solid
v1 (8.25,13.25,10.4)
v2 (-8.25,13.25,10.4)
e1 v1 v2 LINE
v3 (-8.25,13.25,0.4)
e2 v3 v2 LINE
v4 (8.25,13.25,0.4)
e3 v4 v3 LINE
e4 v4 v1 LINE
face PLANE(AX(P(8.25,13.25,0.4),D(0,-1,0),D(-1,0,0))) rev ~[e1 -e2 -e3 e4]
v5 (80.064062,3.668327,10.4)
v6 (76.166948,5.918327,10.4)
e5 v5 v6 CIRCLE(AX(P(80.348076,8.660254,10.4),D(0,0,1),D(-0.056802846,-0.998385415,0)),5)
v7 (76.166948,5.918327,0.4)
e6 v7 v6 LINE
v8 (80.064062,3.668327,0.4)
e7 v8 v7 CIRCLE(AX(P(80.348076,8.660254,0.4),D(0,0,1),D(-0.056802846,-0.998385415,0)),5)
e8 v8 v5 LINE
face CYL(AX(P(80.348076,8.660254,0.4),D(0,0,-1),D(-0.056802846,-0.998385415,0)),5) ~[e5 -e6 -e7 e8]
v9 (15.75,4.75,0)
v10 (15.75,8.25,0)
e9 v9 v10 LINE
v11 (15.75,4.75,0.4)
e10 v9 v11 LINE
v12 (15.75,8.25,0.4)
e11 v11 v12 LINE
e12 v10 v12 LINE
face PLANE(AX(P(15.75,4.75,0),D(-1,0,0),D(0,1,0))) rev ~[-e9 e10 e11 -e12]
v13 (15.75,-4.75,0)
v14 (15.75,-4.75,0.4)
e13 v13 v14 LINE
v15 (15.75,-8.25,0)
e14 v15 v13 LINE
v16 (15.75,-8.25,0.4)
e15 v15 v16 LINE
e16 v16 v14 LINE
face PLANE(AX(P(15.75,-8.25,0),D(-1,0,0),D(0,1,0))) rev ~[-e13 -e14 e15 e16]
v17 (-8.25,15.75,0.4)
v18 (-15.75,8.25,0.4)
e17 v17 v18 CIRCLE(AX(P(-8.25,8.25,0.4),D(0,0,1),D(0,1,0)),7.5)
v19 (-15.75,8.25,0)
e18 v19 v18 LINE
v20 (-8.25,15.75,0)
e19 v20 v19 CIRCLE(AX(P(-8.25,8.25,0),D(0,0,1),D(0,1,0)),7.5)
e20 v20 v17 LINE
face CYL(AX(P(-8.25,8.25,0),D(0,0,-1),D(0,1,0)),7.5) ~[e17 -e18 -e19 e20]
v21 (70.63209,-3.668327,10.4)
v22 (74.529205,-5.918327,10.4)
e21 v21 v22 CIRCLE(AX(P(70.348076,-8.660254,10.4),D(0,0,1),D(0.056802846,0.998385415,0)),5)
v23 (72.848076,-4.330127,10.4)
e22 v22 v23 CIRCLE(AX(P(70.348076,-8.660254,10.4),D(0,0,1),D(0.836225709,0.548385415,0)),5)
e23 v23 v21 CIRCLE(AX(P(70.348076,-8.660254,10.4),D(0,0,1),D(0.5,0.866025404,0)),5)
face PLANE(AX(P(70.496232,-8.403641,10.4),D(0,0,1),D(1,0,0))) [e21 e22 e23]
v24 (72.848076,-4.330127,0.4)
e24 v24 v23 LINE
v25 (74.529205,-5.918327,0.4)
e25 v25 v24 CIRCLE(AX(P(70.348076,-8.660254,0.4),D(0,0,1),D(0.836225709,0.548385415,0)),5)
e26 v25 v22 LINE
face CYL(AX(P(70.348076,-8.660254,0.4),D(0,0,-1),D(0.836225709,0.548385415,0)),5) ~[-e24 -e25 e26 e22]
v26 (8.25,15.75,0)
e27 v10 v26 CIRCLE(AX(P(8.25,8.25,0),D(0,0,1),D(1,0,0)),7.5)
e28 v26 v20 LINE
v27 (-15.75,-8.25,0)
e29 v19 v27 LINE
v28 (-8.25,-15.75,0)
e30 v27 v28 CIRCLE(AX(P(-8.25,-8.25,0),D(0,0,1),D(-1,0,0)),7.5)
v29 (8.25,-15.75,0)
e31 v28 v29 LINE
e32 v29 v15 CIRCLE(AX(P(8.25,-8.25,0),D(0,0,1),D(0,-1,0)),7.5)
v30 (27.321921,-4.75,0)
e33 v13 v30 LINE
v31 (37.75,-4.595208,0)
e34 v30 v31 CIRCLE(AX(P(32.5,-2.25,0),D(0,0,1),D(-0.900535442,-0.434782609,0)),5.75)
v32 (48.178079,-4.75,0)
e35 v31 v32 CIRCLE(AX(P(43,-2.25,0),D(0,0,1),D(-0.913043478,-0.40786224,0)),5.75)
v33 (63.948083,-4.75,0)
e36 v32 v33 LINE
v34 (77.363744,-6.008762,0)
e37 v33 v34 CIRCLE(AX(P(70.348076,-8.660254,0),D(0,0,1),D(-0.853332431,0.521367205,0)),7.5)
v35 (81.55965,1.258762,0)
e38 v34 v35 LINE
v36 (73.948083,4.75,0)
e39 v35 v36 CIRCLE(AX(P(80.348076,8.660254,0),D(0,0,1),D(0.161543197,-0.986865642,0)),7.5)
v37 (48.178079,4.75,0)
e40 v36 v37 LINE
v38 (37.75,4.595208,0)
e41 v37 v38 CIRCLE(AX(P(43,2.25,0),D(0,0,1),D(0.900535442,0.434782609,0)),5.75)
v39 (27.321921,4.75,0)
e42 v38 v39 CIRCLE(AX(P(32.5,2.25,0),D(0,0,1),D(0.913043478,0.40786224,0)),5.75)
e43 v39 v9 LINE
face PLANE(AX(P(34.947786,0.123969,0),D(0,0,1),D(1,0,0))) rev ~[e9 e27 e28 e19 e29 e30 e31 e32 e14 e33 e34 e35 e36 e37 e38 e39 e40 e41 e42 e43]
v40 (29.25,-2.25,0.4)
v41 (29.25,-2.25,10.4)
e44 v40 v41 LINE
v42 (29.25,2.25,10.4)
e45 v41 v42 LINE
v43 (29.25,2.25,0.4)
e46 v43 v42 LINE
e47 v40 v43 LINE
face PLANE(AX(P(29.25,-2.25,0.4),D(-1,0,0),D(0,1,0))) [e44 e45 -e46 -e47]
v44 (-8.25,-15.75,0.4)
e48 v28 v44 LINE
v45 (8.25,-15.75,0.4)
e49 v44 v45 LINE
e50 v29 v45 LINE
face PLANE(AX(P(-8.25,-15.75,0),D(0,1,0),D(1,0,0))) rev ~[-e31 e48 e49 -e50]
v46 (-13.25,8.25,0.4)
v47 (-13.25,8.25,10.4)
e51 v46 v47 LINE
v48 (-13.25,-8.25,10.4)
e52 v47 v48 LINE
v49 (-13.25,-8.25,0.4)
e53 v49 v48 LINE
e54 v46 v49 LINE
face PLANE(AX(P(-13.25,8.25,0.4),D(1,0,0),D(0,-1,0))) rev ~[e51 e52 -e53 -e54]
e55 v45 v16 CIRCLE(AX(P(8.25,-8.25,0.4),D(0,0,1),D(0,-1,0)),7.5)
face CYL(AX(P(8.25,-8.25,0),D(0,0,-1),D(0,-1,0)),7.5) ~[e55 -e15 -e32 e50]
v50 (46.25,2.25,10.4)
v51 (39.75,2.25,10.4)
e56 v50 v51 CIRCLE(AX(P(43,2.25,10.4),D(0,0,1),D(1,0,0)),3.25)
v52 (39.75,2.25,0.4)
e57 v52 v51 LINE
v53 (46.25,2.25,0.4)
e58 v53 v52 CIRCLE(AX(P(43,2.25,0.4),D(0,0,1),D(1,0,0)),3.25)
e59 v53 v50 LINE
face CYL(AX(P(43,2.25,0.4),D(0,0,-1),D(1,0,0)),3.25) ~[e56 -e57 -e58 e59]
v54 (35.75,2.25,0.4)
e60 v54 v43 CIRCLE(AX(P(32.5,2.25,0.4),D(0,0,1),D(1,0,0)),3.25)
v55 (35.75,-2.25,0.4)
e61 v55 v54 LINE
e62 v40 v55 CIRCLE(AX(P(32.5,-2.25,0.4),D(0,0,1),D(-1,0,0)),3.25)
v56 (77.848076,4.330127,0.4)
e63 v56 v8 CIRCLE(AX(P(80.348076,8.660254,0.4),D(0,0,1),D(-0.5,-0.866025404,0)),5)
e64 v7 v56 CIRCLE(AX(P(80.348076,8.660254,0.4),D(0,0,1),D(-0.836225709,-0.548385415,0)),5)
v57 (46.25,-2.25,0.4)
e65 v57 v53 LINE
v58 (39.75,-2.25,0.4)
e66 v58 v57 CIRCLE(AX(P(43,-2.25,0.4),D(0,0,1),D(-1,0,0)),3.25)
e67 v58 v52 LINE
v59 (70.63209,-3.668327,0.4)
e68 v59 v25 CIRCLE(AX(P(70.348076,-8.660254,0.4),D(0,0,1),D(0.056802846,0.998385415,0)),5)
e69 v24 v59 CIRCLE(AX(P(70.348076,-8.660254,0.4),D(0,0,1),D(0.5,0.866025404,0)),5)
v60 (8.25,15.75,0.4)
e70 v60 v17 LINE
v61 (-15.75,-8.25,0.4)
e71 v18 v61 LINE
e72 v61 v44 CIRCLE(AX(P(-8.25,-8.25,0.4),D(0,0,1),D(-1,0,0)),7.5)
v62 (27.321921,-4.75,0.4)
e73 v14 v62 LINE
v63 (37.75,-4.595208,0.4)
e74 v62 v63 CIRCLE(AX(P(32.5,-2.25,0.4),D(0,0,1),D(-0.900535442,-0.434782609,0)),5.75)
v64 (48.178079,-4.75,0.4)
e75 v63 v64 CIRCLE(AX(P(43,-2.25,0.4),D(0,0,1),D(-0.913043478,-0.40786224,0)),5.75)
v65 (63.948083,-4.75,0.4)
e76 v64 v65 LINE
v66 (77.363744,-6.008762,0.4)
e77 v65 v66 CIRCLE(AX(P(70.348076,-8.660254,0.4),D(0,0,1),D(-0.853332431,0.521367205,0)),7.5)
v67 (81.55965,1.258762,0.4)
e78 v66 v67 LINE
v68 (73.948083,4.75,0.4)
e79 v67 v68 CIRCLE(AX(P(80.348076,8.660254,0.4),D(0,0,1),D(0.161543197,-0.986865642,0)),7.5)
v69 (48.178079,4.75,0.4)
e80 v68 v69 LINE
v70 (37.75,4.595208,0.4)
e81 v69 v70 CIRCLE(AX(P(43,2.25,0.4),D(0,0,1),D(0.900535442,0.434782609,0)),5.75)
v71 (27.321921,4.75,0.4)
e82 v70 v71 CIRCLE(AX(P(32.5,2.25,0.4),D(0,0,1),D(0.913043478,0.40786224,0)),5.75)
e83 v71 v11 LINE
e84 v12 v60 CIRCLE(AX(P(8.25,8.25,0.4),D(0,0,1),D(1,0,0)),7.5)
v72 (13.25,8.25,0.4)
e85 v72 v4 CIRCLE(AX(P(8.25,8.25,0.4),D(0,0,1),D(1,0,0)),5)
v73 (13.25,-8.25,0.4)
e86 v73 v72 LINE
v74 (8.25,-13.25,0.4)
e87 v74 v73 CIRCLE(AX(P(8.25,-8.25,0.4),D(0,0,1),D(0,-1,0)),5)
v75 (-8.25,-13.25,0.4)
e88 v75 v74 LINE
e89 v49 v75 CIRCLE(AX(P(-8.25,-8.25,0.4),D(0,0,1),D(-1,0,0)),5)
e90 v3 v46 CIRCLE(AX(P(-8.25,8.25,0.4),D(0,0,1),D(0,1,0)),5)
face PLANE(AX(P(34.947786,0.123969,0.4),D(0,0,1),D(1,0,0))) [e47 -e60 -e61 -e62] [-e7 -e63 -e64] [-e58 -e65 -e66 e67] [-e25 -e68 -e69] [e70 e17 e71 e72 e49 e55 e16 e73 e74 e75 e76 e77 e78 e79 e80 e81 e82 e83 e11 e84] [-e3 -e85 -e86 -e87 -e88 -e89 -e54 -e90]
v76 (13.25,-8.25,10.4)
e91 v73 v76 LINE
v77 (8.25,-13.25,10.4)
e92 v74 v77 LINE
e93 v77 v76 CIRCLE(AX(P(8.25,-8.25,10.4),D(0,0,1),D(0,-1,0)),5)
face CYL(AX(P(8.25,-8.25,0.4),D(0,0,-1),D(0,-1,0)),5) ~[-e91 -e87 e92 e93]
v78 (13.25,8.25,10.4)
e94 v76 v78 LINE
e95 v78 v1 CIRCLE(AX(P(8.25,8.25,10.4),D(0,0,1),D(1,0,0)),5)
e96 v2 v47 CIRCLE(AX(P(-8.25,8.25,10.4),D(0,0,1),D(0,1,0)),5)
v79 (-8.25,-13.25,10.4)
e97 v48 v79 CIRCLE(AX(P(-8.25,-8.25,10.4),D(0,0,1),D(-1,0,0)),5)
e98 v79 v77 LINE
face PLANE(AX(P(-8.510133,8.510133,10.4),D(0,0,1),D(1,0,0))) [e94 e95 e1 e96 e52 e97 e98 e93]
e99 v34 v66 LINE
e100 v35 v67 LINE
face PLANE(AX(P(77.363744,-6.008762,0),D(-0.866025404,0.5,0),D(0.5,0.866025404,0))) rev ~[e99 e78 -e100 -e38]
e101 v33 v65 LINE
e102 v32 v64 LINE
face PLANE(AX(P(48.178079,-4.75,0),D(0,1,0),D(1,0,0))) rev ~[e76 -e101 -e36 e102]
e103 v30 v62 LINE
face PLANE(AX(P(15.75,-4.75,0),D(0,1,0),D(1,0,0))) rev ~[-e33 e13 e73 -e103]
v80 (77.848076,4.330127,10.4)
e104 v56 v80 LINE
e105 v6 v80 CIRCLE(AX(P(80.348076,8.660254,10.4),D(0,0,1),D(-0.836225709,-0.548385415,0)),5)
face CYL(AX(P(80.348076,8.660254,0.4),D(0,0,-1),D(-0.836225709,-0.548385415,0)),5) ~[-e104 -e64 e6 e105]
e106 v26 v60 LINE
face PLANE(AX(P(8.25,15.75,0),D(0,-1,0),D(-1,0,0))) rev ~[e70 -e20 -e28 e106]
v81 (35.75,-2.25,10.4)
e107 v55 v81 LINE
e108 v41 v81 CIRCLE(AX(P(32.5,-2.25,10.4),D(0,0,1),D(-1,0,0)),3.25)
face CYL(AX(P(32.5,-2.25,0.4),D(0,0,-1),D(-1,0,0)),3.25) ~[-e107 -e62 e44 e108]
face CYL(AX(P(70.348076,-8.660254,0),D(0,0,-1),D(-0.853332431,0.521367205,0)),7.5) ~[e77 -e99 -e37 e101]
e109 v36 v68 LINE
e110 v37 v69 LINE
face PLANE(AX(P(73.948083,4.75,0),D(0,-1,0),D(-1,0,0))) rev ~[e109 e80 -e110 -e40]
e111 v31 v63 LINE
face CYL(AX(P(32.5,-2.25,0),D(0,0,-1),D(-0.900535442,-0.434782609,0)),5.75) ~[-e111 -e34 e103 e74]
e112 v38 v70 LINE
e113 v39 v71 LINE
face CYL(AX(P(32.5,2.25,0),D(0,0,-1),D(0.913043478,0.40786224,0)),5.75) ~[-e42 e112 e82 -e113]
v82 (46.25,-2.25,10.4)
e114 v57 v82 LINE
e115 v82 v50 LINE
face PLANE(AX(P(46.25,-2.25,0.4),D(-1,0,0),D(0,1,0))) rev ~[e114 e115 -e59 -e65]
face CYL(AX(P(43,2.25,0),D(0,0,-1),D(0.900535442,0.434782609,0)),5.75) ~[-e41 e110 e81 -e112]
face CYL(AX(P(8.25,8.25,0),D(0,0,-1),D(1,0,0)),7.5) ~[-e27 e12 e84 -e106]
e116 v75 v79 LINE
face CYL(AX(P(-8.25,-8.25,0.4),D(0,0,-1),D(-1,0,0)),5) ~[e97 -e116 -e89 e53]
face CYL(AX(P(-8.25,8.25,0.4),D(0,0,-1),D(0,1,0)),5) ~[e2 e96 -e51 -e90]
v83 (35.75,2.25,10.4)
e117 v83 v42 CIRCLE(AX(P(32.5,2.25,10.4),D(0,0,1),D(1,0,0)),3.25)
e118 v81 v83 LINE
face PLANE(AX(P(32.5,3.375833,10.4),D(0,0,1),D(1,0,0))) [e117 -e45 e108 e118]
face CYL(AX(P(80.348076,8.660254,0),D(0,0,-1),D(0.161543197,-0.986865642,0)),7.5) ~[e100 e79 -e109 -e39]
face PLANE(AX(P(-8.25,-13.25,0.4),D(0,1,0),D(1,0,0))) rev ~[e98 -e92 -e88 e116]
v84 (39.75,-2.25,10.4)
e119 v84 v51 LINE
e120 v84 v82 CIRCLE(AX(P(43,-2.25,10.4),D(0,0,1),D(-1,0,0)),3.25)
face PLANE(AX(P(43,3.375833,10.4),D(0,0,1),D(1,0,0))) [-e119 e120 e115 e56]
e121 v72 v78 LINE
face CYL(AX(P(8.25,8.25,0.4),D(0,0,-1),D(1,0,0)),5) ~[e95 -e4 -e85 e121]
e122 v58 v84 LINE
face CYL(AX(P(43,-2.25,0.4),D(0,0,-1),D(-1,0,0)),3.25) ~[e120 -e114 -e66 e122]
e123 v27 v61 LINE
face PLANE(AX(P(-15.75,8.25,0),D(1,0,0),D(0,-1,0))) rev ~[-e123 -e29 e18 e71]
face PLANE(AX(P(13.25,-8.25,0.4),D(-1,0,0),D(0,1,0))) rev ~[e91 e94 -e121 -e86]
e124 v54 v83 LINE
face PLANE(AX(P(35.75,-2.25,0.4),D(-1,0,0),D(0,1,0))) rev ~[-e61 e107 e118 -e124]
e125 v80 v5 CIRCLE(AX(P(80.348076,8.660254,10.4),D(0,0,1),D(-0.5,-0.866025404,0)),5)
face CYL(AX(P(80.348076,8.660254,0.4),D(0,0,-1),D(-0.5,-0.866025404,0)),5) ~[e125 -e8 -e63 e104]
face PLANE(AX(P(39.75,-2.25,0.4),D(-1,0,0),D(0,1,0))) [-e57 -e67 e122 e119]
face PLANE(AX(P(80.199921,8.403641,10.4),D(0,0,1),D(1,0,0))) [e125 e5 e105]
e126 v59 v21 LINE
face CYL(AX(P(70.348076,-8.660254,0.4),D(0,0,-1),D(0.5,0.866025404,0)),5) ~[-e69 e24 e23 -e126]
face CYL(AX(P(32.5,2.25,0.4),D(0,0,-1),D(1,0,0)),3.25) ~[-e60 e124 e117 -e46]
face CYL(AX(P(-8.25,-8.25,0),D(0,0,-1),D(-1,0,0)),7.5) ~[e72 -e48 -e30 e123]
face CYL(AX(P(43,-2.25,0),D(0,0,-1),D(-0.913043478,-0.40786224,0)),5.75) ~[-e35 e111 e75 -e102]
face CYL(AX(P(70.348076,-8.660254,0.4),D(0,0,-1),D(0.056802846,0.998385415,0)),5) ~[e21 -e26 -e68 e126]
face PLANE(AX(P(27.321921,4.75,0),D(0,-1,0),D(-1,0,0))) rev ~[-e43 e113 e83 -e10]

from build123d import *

# Parameters (mm, degrees)
F0_W     = 16
F0_H     = 4.5
F0_W_2   = 6.5
F0_W_3   = 4
F1_DEPTH = 0.4
F2_W     = 6.5
F2_H     = 4.5
F3_DEPTH = 10


# Not quite as in the source:
# - the program builds the solid bodies; features that only make, move or delete a surface that nothing else refers to are left out


with BuildPart() as f1:
    # F0 (on Top) → F1 (new body)
    with BuildSketch(Plane.XY):
        with BuildLine():
            Line((15.75, 4.75), (15.75, 8.25))
            ThreePointArc((15.75, 8.25), (13.5533008589, 13.5533008589), (8.25, 15.75))
            Line((8.25, 15.75), (-8.25, 15.75))
            ThreePointArc((-8.25, 15.75), (-13.5533008589, 13.5533008589), (-15.75, 8.25))
            Line((-15.75, 8.25), (-15.75, -8.25))
            ThreePointArc((-15.75, -8.25), (-13.5533008589, -13.5533008589), (-8.25, -15.75))
            Line((-8.25, -15.75), (8.25, -15.75))
            ThreePointArc((8.25, -15.75), (13.5533008589, -13.5533008589), (15.75, -8.25))
            Line((15.75, -8.25), (15.75, -4.75))
            Line((15.75, -4.75), (27.3219212057, -4.75))
            ThreePointArc((27.3219212057, -4.75), (32.5853423404, -7.9993666334), (37.75, -4.5952078799))
            ThreePointArc((37.75, -4.5952078799), (42.9146576596, -7.9993666334), (48.1780787943, -4.75))
            Line((48.1780787943, -4.75), (63.9480829801, -4.75))
            ThreePointArc((63.9480829801, -4.75), (69.6474451199, -16.1274567319), (77.3637435709, -6.0087617221))
            Line((77.3637435709, -6.0087617221), (81.5596501878, 1.2587617221))
            ThreePointArc((81.5596501878, 1.2587617221), (83.4749132345, 15.4773568118), (73.9480829801, 4.75))
            Line((73.9480829801, 4.75), (48.1780787943, 4.75))
            ThreePointArc((48.1780787943, 4.75), (42.9146576596, 7.9993666334), (37.75, 4.5952078799))
            ThreePointArc((37.75, 4.5952078799), (32.5853423404, 7.9993666334), (27.3219212057, 4.75))
            Line((27.3219212057, 4.75), (15.75, 4.75))
        make_face()
        with BuildLine():
            Line((4.5, 13.25), (8.25, 13.25))
            ThreePointArc((8.25, 13.25), (11.7855339059, 11.7855339059), (13.25, 8.25))
            Line((13.25, 8.25), (13.25, 4.5))
            Line((13.25, 4.5), (13.25, 2.25))
            Line((13.25, 2.25), (29.25, 2.25))
            ThreePointArc((29.25, 2.25), (32.5, 5.5), (35.75, 2.25))
            Line((35.75, 2.25), (39.75, 2.25))
            ThreePointArc((39.75, 2.25), (43, 5.5), (46.25, 2.25))
            Line((46.25, 2.25), (74.0490381057, 2.25))
            Line((74.0490381057, 2.25), (76.1669476654, 5.9183269633))
            ThreePointArc((76.1669476654, 5.9183269633), (82.8480762114, 12.9903810568), (80.0640619824, 3.6683269633))
            Line((80.0640619824, 3.6683269633), (74.5292047573, -5.9183269633))
            ThreePointArc((74.5292047573, -5.9183269633), (69.1116253195, -13.504961376), (67.9923047195, -4.25))
            ThreePointArc((67.9923047195, -4.25), (69.2721438624, -3.7773891431), (70.6320904403, -3.6683269633))
            Line((70.6320904403, -3.6683269633), (71.4509618943, -2.25))
            Line((71.4509618943, -2.25), (46.25, -2.25))
            ThreePointArc((46.25, -2.25), (43, -5.5), (39.75, -2.25))
            Line((39.75, -2.25), (35.75, -2.25))
            ThreePointArc((35.75, -2.25), (32.5, -5.5), (29.25, -2.25))
            Line((29.25, -2.25), (13.25, -2.25))
            Line((13.25, -2.25), (13.25, -4.5))
            Line((13.25, -4.5), (13.25, -8.25))
            ThreePointArc((13.25, -8.25), (11.7855339059, -11.7855339059), (8.25, -13.25))
            Line((8.25, -13.25), (4.5, -13.25))
            Line((4.5, -13.25), (-4.5, -13.25))
            Line((-4.5, -13.25), (-8.25, -13.25))
            ThreePointArc((-8.25, -13.25), (-11.7855339059, -11.7855339059), (-13.25, -8.25))
            Line((-13.25, -8.25), (-13.25, -4.5))
            Line((-13.25, -4.5), (-13.25, 4.5))
            Line((-13.25, 4.5), (-13.25, 8.25))
            ThreePointArc((-13.25, 8.25), (-11.7855339059, 11.7855339059), (-8.25, 13.25))
            Line((-8.25, 13.25), (-4.5, 13.25))
            Line((-4.5, 13.25), (4.5, 13.25))
        make_face(mode=Mode.SUBTRACT)
        with BuildLine():
            Line((13.25, -4.5), (4.5, -4.5))
            Line((4.5, -4.5), (4.5, -13.25))
            Line((4.5, -13.25), (8.25, -13.25))
            ThreePointArc((8.25, -13.25), (11.7855339059, -11.7855339059), (13.25, -8.25))
            Line((13.25, -8.25), (13.25, -4.5))
        make_face()
        Polygon((13.25, 4.5), (4.5, 4.5), (4.5, 0), (4.5, -4.5), (13.25, -4.5), (13.25, -2.25), (13.25, 2.25), align=None)
        with BuildLine():
            ThreePointArc((13.25, 8.25), (11.7855339059, 11.7855339059), (8.25, 13.25))
            Line((8.25, 13.25), (4.5, 13.25))
            Line((4.5, 13.25), (4.5, 4.5))
            Line((4.5, 4.5), (13.25, 4.5))
            Line((13.25, 4.5), (13.25, 8.25))
        make_face()
        Polygon((4.5, 4.5), (4.5, 13.25), (-4.5, 13.25), (-4.5, 4.5), (0, 4.5), align=None)
        with Locations((21.25, 0)):
            Rectangle(F0_W, F0_H)
        with Locations((32.5, 0)):
            Rectangle(F0_W_2, F0_H)
        with BuildLine():
            ThreePointArc((35.75, 2.25), (32.5, 5.5), (29.25, 2.25))
            Line((29.25, 2.25), (35.75, 2.25))
        make_face()
        with BuildLine():
            Line((35.75, -2.25), (29.25, -2.25))
            ThreePointArc((29.25, -2.25), (32.5, -5.5), (35.75, -2.25))
        make_face()
        with Locations((37.75, 0)):
            Rectangle(F0_W_3, F0_H)
        with BuildLine():
            ThreePointArc((46.25, 2.25), (43, 5.5), (39.75, 2.25))
            Line((39.75, 2.25), (46.25, 2.25))
        make_face()
        with Locations((43, 0)):
            Rectangle(F0_W_2, F0_H)
        with BuildLine():
            Line((46.25, -2.25), (39.75, -2.25))
            ThreePointArc((39.75, -2.25), (43, -5.5), (46.25, -2.25))
        make_face()
        Polygon((74.0490381057, 2.25), (46.25, 2.25), (46.25, -2.25), (71.4509618943, -2.25), align=None)
        with BuildLine():
            ThreePointArc((80.0640619824, 3.6683269633), (82.8480762114, 12.9903810568), (76.1669476654, 5.9183269633))
            ThreePointArc((76.1669476654, 5.9183269633), (77.8480762114, 4.3301270189), (80.0640619824, 3.6683269633))
        make_face()
        with BuildLine():
            Line((76.1669476654, 5.9183269633), (74.0490381057, 2.25))
            Line((74.0490381057, 2.25), (71.4509618943, -2.25))
            Line((71.4509618943, -2.25), (70.6320904403, -3.6683269633))
            ThreePointArc((70.6320904403, -3.6683269633), (72.8480762114, -4.3301270189), (74.5292047573, -5.9183269633))
            Line((74.5292047573, -5.9183269633), (80.0640619824, 3.6683269633))
            ThreePointArc((80.0640619824, 3.6683269633), (77.8480762114, 4.3301270189), (76.1669476654, 5.9183269633))
        make_face()
        with BuildLine():
            ThreePointArc((74.5292047573, -5.9183269633), (72.8480762114, -4.3301270189), (70.6320904403, -3.6683269633))
            ThreePointArc((70.6320904403, -3.6683269633), (69.2721438624, -3.7773891431), (67.9923047195, -4.25))
            ThreePointArc((67.9923047195, -4.25), (69.1116253195, -13.504961376), (74.5292047573, -5.9183269633))
        make_face()
        Polygon((4.5, -4.5), (0, -4.5), (-4.5, -4.5), (-4.5, -13.25), (4.5, -13.25), align=None)
        with BuildLine():
            ThreePointArc((0, -4.5), (3.1819805153, -3.1819805153), (4.5, 0))
            ThreePointArc((4.5, 0), (3.1819805153, 3.1819805153), (0, 4.5))
            ThreePointArc((0, 4.5), (-3.1819805153, 3.1819805153), (-4.5, 0))
            ThreePointArc((-4.5, 0), (-3.1819805153, -3.1819805153), (0, -4.5))
        make_face()
        with BuildLine():
            Line((-4.5, -13.25), (-4.5, -4.5))
            Line((-4.5, -4.5), (-13.25, -4.5))
            Line((-13.25, -4.5), (-13.25, -8.25))
            ThreePointArc((-13.25, -8.25), (-11.7855339059, -11.7855339059), (-8.25, -13.25))
            Line((-8.25, -13.25), (-4.5, -13.25))
        make_face()
        Polygon((-4.5, 0), (-4.5, 4.5), (-13.25, 4.5), (-13.25, -4.5), (-4.5, -4.5), align=None)
        with BuildLine():
            Line((-4.5, 4.5), (-4.5, 13.25))
            Line((-4.5, 13.25), (-8.25, 13.25))
            ThreePointArc((-8.25, 13.25), (-11.7855339059, 11.7855339059), (-13.25, 8.25))
            Line((-13.25, 8.25), (-13.25, 4.5))
            Line((-13.25, 4.5), (-4.5, 4.5))
        make_face()
        with BuildLine():
            Line((4.5, 0), (4.5, 4.5))
            Line((4.5, 4.5), (0, 4.5))
            ThreePointArc((0, 4.5), (3.1819805153, 3.1819805153), (4.5, 0))
        make_face()
        with BuildLine():
            Line((4.5, -4.5), (4.5, 0))
            ThreePointArc((4.5, 0), (3.1819805153, -3.1819805153), (0, -4.5))
            Line((0, -4.5), (4.5, -4.5))
        make_face()
        with BuildLine():
            ThreePointArc((0, -4.5), (-3.1819805153, -3.1819805153), (-4.5, 0))
            Line((-4.5, 0), (-4.5, -4.5))
            Line((-4.5, -4.5), (0, -4.5))
        make_face()
        with BuildLine():
            Line((0, 4.5), (-4.5, 4.5))
            Line((-4.5, 4.5), (-4.5, 0))
            ThreePointArc((-4.5, 0), (-3.1819805153, 3.1819805153), (0, 4.5))
        make_face()
    extrude(amount=F1_DEPTH)

    # F2 (on face) → F3 (join)
    with BuildSketch(Plane.XY.offset(0.4)):
        with BuildLine():
            Line((-4.5, 4.5), (-4.5, 13.25))
            Line((-4.5, 13.25), (-8.25, 13.25))
            ThreePointArc((-8.25, 13.25), (-11.7855339059, 11.7855339059), (-13.25, 8.25))
            Line((-13.25, 8.25), (-13.25, 4.5))
            Line((-13.25, 4.5), (-4.5, 4.5))
        make_face()
        Polygon((4.5, 4.5), (4.5, 13.25), (-4.5, 13.25), (-4.5, 4.5), (0, 4.5), align=None)
        with BuildLine():
            ThreePointArc((13.25, 8.25), (11.7855339059, 11.7855339059), (8.25, 13.25))
            Line((8.25, 13.25), (4.5, 13.25))
            Line((4.5, 13.25), (4.5, 4.5))
            Line((4.5, 4.5), (13.25, 4.5))
            Line((13.25, 4.5), (13.25, 8.25))
        make_face()
        Polygon((13.25, 4.5), (4.5, 4.5), (4.5, 0), (4.5, -4.5), (13.25, -4.5), (13.25, -2.25), (13.25, 2.25), align=None)
        Polygon((4.5, -4.5), (0, -4.5), (-4.5, -4.5), (-4.5, -13.25), (4.5, -13.25), align=None)
        with BuildLine():
            Line((-4.5, -13.25), (-4.5, -4.5))
            Line((-4.5, -4.5), (-13.25, -4.5))
            Line((-13.25, -4.5), (-13.25, -8.25))
            ThreePointArc((-13.25, -8.25), (-11.7855339059, -11.7855339059), (-8.25, -13.25))
            Line((-8.25, -13.25), (-4.5, -13.25))
        make_face()
        Polygon((-4.5, 0), (-4.5, 4.5), (-13.25, 4.5), (-13.25, -4.5), (-4.5, -4.5), align=None)
        with BuildLine():
            ThreePointArc((0, -4.5), (3.1819805153, -3.1819805153), (4.5, 0))
            ThreePointArc((4.5, 0), (3.1819805153, 3.1819805153), (0, 4.5))
            ThreePointArc((0, 4.5), (-3.1819805153, 3.1819805153), (-4.5, 0))
            ThreePointArc((-4.5, 0), (-3.1819805153, -3.1819805153), (0, -4.5))
        make_face()
        with BuildLine():
            Line((4.5, 0), (4.5, 4.5))
            Line((4.5, 4.5), (0, 4.5))
            ThreePointArc((0, 4.5), (3.1819805153, 3.1819805153), (4.5, 0))
        make_face()
        with BuildLine():
            Line((0, 4.5), (-4.5, 4.5))
            Line((-4.5, 4.5), (-4.5, 0))
            ThreePointArc((-4.5, 0), (-3.1819805153, 3.1819805153), (0, 4.5))
        make_face()
        with BuildLine():
            ThreePointArc((0, -4.5), (-3.1819805153, -3.1819805153), (-4.5, 0))
            Line((-4.5, 0), (-4.5, -4.5))
            Line((-4.5, -4.5), (0, -4.5))
        make_face()
        with BuildLine():
            Line((4.5, -4.5), (4.5, 0))
            ThreePointArc((4.5, 0), (3.1819805153, -3.1819805153), (0, -4.5))
            Line((0, -4.5), (4.5, -4.5))
        make_face()
        with BuildLine():
            Line((13.25, -4.5), (4.5, -4.5))
            Line((4.5, -4.5), (4.5, -13.25))
            Line((4.5, -13.25), (8.25, -13.25))
            ThreePointArc((8.25, -13.25), (11.7855339059, -11.7855339059), (13.25, -8.25))
            Line((13.25, -8.25), (13.25, -4.5))
        make_face()
        with BuildLine():
            ThreePointArc((35.75, 2.25), (32.5, 5.5), (29.25, 2.25))
            Line((29.25, 2.25), (35.75, 2.25))
        make_face()
        with Locations((32.5, 0)):
            Rectangle(F2_W, F2_H)
        with BuildLine():
            Line((35.75, -2.25), (29.25, -2.25))
            ThreePointArc((29.25, -2.25), (32.5, -5.5), (35.75, -2.25))
        make_face()
        with BuildLine():
            ThreePointArc((46.25, 2.25), (43, 5.5), (39.75, 2.25))
            Line((39.75, 2.25), (46.25, 2.25))
        make_face()
        with Locations((43, 0)):
            Rectangle(F2_W, F2_H)
        with BuildLine():
            Line((46.25, -2.25), (39.75, -2.25))
            ThreePointArc((39.75, -2.25), (43, -5.5), (46.25, -2.25))
        make_face()
        with BuildLine():
            ThreePointArc((72.8480762114, -4.3301270189), (71.7788727151, -3.8693437522), (70.6320904403, -3.6683269633))
            ThreePointArc((70.6320904403, -3.6683269633), (67.8480762114, -12.9903810568), (74.5292047573, -5.9183269633))
            ThreePointArc((74.5292047573, -5.9183269633), (73.7817279741, -5.0256927751), (72.8480762114, -4.3301270189))
        make_face()
        with BuildLine():
            ThreePointArc((80.0640619824, 3.6683269633), (82.8480762114, 12.9903810568), (76.1669476654, 5.9183269633))
            ThreePointArc((76.1669476654, 5.9183269633), (76.9144244486, 5.0256927751), (77.8480762114, 4.3301270189))
            ThreePointArc((77.8480762114, 4.3301270189), (78.9172797076, 3.8693437522), (80.0640619824, 3.6683269633))
        make_face()
    extrude(amount=F3_DEPTH)


solid = f1.part
